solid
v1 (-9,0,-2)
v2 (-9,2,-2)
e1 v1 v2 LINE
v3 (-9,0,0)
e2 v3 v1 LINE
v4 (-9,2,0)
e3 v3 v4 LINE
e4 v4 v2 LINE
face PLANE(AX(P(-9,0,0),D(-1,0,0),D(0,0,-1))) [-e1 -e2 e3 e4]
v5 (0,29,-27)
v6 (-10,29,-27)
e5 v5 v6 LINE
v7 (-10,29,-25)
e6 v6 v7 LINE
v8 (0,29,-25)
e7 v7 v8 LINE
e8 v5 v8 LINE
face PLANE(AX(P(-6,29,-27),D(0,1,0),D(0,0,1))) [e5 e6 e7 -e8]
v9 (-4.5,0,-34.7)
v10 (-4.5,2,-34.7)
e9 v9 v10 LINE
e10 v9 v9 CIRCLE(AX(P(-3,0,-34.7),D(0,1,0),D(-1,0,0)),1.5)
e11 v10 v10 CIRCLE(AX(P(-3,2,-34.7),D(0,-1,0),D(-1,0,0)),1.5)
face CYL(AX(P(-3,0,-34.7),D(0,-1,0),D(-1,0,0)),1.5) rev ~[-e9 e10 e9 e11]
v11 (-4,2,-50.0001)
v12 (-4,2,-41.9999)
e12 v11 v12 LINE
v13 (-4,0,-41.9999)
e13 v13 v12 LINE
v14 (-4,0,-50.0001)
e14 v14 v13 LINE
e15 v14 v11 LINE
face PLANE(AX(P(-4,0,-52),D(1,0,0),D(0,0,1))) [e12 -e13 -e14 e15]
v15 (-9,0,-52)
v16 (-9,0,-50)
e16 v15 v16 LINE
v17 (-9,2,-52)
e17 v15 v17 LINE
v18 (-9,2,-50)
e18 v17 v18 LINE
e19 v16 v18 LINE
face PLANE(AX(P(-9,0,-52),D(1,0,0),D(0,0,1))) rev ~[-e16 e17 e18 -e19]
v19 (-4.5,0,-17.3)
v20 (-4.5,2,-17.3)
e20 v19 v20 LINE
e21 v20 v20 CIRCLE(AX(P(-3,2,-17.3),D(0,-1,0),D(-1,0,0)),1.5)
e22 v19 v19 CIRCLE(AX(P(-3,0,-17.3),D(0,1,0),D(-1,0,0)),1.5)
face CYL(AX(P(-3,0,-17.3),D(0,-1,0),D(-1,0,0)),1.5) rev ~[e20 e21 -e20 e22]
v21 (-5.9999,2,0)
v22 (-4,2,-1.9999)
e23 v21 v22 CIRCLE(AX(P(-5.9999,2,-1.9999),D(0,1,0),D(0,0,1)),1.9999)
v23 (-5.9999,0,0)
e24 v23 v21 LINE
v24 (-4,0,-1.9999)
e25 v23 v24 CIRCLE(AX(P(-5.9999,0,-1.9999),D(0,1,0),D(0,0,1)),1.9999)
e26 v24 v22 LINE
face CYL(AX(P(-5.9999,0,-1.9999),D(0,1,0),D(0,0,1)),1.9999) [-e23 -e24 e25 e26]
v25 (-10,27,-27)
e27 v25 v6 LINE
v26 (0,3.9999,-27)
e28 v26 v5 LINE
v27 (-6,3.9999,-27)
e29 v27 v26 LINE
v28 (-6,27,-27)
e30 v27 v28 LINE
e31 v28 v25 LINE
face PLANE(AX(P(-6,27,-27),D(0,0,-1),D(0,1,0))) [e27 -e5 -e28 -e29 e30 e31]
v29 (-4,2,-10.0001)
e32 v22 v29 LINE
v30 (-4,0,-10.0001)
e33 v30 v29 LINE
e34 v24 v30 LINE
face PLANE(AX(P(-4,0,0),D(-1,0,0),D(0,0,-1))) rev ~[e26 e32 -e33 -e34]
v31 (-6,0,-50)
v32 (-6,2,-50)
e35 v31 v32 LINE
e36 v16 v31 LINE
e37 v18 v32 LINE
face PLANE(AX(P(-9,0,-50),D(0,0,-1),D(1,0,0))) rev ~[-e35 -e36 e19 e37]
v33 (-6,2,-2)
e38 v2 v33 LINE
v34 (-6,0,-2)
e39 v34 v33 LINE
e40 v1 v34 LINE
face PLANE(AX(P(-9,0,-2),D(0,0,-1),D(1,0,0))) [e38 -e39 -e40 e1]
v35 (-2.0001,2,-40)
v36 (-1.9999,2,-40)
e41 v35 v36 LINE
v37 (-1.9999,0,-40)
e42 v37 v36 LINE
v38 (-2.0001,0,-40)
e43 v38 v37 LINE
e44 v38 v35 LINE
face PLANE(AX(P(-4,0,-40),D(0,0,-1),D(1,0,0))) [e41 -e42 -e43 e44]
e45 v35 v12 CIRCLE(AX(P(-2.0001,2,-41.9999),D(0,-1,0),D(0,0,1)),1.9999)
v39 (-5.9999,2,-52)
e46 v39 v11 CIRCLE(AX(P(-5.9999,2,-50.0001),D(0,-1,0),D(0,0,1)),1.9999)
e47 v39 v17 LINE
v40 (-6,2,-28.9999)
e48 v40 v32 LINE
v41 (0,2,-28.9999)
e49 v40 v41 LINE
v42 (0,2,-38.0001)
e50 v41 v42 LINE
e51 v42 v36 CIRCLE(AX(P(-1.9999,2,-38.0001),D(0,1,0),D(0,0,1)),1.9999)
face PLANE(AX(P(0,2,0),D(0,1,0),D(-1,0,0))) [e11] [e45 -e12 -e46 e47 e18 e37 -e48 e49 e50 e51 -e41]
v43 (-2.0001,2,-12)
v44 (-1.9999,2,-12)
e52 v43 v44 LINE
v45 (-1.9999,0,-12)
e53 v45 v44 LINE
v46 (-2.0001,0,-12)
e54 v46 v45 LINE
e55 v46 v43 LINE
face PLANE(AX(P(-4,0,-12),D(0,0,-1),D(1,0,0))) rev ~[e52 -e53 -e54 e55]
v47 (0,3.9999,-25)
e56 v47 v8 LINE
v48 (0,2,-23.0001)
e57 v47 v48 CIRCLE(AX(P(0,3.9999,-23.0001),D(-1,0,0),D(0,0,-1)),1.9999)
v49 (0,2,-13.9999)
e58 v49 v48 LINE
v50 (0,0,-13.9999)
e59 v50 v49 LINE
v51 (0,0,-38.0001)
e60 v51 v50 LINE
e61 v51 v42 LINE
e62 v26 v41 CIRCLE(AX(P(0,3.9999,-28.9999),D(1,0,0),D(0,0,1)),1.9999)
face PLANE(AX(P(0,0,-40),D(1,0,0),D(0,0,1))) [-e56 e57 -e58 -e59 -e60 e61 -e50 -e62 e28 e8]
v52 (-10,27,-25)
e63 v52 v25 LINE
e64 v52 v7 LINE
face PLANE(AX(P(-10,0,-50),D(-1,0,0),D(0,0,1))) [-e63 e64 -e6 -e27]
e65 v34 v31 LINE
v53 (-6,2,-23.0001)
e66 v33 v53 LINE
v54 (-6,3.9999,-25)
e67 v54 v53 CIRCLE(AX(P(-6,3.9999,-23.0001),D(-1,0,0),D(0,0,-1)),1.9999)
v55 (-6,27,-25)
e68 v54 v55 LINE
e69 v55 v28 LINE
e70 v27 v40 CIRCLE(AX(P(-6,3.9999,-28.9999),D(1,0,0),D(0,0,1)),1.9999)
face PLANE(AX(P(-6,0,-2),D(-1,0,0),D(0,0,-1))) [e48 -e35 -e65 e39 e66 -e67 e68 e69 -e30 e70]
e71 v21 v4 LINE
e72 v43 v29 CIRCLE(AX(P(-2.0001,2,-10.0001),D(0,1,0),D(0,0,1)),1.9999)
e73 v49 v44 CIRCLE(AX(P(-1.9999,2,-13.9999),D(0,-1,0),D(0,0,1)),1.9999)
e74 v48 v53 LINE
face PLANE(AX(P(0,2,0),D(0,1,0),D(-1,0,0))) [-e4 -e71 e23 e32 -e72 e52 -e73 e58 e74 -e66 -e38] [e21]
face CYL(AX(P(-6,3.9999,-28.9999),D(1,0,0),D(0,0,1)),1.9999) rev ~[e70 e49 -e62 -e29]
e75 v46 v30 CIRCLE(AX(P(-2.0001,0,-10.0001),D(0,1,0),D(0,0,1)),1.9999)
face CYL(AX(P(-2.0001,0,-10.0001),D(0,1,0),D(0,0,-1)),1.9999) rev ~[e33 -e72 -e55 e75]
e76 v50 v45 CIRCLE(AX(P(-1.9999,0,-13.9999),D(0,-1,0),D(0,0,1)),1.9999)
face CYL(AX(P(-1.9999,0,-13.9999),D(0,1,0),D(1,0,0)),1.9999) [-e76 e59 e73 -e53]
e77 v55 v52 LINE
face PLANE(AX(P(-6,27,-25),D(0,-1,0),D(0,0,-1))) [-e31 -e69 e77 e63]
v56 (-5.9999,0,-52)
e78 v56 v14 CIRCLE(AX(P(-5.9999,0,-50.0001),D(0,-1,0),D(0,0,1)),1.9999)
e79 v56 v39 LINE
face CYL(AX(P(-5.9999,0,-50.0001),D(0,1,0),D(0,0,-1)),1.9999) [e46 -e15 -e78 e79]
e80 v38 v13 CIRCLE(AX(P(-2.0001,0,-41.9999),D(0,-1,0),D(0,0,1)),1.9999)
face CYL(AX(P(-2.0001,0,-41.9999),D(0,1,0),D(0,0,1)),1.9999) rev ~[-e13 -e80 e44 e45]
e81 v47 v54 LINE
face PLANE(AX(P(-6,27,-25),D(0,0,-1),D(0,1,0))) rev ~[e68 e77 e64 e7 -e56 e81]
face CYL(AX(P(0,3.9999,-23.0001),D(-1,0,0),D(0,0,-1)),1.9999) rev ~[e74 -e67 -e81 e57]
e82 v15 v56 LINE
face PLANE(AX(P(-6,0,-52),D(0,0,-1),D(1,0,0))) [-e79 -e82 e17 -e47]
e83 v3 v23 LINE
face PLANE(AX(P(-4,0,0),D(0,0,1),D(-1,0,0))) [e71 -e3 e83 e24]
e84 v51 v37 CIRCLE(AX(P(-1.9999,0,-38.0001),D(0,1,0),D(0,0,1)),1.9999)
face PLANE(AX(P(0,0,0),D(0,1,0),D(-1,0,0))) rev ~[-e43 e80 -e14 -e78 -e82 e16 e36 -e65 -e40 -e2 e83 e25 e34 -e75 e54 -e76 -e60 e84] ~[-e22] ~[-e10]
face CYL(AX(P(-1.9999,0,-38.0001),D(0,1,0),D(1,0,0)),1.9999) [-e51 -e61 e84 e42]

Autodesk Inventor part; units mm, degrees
ref_plane "YZ Plane" through (0, 0, 0) normal (1, 0, 0) x (0, 1, 0)
ref_plane "XZ Plane" through (0, 0, 0) normal (0, 1, 0) x (-1, 0, 0)
ref_plane "XY Plane" through (0, 0, 0) normal (0, 0, 1) x (1, 0, 0)
sketch "Sketch1" plane through (0, 0, 0) normal (0, 1, 0) x (-1, 0, 0)
  line L0 (0, 0) -> (6, 0)
  line L1 (6, 0) -> (6, -52)
  line L2 (6, -52) -> (0, -52)
  line L3 (0, -52) -> (0, 0)
  line L4 (6, 0) -> (9, 0)
  line L5 (9, 0) -> (9, -2)
  line L6 (9, -2) -> (6, -2)
  line L7 (6, -2) -> (6, 0)
  line L8 (6, -52) -> (9, -52)
  line L9 (9, -52) -> (9, -50)
  line L10 (9, -50) -> (6, -50)
  line L11 (6, -50) -> (6, -52)
  line L12 (0, 0) -> (4, 0)
  line L13 (4, 0) -> (4, -12)
  line L14 (4, -12) -> (0, -12)
  line L15 (0, -12) -> (0, 0)
  line L16 (0, -52) -> (4, -52)
  line L17 (4, -52) -> (4, -40)
  line L18 (4, -40) -> (0, -40)
  line L19 (0, -40) -> (0, -52)
  line L20 (0, -26) -> (3, -26)
  line L21 (3, -26) -> (3, -34.7)
  line L22 (3, -34.7) -> (3, -17.3)
  circle A0 centre (3, -17.3) radius 1.5
  circle A1 centre (3, -34.7) radius 1.5
  point P0 (0, -40)
  point P1 (6, -50)
  point P2 (6, -2)
  dimension "d0" = 6
  dimension "d1" = 52
  dimension "d2" = 3
  dimension "d3" = 2
  dimension "d4" = 3
  dimension "d5" = 2
  dimension "d6" = 4
  dimension "d7" = 12
  dimension "d8" = 4
  dimension "d9" = 12
  dimension "d10" = 3
  dimension "d11" = 8.7
  dimension "d12" = 17.4
  dimension "d13" = 3
  dimension "d14" = 3
extrude "Extrusion1" add sketch "Sketch1" along normal blind 2 contours L0 L1 L2 L17 L18 L3 L14 L13 | L4 L5 L6 L1 | L10 L9 L8 L1
sketch "Sketch2" plane through (0, 2, 0) normal (0, 1, 0) x (1, 0, 0)
  line L0 (0, 12) -> (0, 40) projected
  line L1 (0, 26) -> (-6, 26)
  line L2 (-6, 50) -> (-6, 2) projected
  line L3 (0, 25) -> (-6, 25)
  line L4 (-6, 25) -> (-6, 27)
  line L5 (-6, 27) -> (0, 27)
  line L6 (0, 27) -> (0, 25)
  line L7 (0, 25) -> (-6, 27) construction
  line L8 (-6, 25) -> (0, 27) construction
  point P0 (0, 0)
  point P1 (-3, 26)
  point P2 (0, 25)
  point P3 (0, 27)
  dimension "d17" = 2
extrude "Extrusion2" add sketch "Sketch2" along normal blind 27
sketch "Sketch3" plane through (-6, 0, -50) normal (-1, 0, 0) x (0, 0, 1)
  line L0 (23, 29) -> (25, 29) projected
  line L1 (25, 2) -> (25, 29) projected
  line L2 (23, 29) -> (25, 29)
  line L3 (25, 29) -> (25, 27)
  line L4 (25, 27) -> (23, 27)
  line L5 (23, 27) -> (23, 29)
  point P0 (50, 0)
  dimension "d20" = 2
extrude "Extrusion3" add sketch "Sketch3" along normal blind 4
fillet "Fillet1" radius 2 8 edges at (-3, 2, -25) (-3, 2, -27) (-4, 1, -12) (-4, 1, 0) (-4, 1, -52) (0, 1, -40) (0, 1, -12) (-4, 1, -40)
properties part number "battery_holder_1"
